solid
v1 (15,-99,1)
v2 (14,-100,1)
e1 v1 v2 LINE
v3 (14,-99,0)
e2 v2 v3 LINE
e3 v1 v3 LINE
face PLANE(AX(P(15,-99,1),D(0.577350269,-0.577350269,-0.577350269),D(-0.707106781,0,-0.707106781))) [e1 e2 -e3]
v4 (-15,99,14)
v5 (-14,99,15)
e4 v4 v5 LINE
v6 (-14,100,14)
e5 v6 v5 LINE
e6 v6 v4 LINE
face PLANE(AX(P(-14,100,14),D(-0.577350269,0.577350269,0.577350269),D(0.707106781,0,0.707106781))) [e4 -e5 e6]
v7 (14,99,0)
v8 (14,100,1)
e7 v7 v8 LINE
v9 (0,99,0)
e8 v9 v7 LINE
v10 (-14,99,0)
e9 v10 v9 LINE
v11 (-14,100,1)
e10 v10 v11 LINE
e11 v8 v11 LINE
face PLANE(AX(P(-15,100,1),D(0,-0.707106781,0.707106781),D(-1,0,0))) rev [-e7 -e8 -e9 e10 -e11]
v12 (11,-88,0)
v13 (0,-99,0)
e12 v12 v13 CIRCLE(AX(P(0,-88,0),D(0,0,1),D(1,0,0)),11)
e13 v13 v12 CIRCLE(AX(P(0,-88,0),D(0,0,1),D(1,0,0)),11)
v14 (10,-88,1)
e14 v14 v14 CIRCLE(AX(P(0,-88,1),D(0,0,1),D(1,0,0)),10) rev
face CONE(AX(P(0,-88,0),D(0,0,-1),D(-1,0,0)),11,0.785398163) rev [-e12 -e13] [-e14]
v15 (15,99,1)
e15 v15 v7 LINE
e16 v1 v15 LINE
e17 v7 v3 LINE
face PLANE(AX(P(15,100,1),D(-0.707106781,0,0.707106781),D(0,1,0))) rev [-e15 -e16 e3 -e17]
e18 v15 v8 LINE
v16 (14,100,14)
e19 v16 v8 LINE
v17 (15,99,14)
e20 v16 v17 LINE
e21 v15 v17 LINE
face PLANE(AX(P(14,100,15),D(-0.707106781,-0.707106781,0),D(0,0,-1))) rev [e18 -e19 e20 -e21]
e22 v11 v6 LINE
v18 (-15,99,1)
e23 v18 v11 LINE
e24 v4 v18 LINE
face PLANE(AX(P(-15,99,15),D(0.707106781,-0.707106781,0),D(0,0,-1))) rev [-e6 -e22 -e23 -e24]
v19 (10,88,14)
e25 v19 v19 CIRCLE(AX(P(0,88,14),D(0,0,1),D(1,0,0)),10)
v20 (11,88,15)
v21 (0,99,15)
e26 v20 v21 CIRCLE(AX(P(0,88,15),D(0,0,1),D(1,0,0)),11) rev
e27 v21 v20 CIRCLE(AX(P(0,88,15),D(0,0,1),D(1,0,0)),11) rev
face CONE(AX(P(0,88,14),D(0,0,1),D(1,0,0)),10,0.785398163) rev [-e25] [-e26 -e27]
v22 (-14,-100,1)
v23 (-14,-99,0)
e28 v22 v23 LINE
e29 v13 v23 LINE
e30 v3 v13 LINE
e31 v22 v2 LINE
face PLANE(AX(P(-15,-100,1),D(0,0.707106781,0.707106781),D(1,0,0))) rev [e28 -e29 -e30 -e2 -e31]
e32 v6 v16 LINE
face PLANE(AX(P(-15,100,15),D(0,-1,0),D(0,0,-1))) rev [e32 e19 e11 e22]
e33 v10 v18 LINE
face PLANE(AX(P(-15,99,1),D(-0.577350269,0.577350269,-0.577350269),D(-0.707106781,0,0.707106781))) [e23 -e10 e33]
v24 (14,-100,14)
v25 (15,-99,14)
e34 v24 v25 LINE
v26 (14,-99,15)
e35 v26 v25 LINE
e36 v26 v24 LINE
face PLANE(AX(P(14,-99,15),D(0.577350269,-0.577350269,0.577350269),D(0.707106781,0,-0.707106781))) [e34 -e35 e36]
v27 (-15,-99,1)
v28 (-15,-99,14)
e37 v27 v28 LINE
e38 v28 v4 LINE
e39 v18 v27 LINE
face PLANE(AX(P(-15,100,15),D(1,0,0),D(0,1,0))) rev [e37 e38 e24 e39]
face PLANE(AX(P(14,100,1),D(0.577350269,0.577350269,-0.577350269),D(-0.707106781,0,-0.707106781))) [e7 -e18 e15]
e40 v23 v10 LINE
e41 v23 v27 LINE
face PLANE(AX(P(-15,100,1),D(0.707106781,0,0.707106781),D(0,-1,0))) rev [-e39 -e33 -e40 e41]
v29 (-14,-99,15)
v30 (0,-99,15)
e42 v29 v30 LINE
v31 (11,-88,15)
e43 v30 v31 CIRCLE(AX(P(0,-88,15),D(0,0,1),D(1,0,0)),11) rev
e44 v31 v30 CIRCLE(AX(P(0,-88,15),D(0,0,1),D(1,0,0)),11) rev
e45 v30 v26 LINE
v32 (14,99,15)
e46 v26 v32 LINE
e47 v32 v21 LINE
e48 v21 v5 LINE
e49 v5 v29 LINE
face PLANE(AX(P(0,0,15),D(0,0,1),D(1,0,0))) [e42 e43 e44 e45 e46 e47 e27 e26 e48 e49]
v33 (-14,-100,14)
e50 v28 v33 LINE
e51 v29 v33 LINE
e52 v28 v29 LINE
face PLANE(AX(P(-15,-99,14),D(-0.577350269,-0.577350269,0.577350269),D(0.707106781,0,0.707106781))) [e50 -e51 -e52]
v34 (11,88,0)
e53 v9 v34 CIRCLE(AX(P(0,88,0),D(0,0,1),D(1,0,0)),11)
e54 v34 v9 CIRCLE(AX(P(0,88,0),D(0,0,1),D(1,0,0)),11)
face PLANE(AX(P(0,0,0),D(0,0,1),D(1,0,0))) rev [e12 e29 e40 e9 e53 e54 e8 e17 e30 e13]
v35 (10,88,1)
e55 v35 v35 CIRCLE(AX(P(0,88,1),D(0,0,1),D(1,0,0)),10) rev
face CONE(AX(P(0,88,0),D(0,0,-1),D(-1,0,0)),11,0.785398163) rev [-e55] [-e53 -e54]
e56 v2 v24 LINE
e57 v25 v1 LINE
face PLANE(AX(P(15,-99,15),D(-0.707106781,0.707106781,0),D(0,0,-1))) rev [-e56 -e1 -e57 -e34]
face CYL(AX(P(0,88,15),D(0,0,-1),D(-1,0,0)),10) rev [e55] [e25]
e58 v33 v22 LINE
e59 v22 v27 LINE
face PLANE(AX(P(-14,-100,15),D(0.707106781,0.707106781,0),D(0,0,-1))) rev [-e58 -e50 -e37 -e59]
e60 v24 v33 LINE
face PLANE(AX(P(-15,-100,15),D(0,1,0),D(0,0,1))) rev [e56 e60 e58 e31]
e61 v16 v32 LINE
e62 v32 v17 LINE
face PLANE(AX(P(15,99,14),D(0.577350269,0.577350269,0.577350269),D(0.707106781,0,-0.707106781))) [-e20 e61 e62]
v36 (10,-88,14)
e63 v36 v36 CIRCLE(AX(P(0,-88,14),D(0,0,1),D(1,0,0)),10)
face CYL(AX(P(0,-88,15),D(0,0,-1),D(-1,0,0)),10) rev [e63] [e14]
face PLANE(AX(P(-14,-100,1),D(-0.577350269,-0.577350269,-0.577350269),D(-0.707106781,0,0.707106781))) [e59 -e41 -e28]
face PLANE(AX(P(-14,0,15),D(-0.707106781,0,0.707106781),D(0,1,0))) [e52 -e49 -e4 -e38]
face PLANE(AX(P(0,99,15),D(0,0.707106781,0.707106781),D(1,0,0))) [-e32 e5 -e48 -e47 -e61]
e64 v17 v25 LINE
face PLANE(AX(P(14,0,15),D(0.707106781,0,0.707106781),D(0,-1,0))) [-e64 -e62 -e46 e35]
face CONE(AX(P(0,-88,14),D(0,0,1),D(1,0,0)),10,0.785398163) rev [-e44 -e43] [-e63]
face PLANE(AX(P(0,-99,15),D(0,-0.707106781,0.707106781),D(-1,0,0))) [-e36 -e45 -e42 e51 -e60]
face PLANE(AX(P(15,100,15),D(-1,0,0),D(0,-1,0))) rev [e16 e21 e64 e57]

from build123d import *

# Parameters (mm, degrees)
SKETCH1_W           = 30
SKETCH1_H           = 200
SKETCH1_R           = 10
BOSS_EXTRUDE1_DEPTH = 15
CHAMFER1_SIZE       = 1


with BuildPart() as part:
    # Sketch1 → Boss-Extrude1 (new body)
    with BuildSketch(Plane.XY):
        Rectangle(SKETCH1_W, SKETCH1_H)
        with Locations((0, 88)):
            Circle(SKETCH1_R, mode=Mode.SUBTRACT)
        with Locations((0, -88)):
            Circle(SKETCH1_R, mode=Mode.SUBTRACT)
    extrude(amount=BOSS_EXTRUDE1_DEPTH)

    # Chamfer1
    chamfer1_edges = [part.edges().sort_by_distance(p)[0] for p in [
        (-15, 0, 15),
        (-10, 88, 0),
        (-10, 88, 15),
        (0, -100, 15),
        (-10, -88, 0),
        (-10, -88, 15),
        (15, 0, 15),
        (0, -100, 0),
        (-15, 0, 0),
        (0, 100, 0),
        (15, 0, 0),
        (0, 100, 15),
        (15, -100, 7.5),
        (-15, -100, 7.5),
        (-15, 100, 7.5),
        (15, 100, 7.5),
    ]]
    chamfer(chamfer1_edges, length=CHAMFER1_SIZE - 0.0001)  # a hair under: the kernel refuses the full size


solid = part.part
